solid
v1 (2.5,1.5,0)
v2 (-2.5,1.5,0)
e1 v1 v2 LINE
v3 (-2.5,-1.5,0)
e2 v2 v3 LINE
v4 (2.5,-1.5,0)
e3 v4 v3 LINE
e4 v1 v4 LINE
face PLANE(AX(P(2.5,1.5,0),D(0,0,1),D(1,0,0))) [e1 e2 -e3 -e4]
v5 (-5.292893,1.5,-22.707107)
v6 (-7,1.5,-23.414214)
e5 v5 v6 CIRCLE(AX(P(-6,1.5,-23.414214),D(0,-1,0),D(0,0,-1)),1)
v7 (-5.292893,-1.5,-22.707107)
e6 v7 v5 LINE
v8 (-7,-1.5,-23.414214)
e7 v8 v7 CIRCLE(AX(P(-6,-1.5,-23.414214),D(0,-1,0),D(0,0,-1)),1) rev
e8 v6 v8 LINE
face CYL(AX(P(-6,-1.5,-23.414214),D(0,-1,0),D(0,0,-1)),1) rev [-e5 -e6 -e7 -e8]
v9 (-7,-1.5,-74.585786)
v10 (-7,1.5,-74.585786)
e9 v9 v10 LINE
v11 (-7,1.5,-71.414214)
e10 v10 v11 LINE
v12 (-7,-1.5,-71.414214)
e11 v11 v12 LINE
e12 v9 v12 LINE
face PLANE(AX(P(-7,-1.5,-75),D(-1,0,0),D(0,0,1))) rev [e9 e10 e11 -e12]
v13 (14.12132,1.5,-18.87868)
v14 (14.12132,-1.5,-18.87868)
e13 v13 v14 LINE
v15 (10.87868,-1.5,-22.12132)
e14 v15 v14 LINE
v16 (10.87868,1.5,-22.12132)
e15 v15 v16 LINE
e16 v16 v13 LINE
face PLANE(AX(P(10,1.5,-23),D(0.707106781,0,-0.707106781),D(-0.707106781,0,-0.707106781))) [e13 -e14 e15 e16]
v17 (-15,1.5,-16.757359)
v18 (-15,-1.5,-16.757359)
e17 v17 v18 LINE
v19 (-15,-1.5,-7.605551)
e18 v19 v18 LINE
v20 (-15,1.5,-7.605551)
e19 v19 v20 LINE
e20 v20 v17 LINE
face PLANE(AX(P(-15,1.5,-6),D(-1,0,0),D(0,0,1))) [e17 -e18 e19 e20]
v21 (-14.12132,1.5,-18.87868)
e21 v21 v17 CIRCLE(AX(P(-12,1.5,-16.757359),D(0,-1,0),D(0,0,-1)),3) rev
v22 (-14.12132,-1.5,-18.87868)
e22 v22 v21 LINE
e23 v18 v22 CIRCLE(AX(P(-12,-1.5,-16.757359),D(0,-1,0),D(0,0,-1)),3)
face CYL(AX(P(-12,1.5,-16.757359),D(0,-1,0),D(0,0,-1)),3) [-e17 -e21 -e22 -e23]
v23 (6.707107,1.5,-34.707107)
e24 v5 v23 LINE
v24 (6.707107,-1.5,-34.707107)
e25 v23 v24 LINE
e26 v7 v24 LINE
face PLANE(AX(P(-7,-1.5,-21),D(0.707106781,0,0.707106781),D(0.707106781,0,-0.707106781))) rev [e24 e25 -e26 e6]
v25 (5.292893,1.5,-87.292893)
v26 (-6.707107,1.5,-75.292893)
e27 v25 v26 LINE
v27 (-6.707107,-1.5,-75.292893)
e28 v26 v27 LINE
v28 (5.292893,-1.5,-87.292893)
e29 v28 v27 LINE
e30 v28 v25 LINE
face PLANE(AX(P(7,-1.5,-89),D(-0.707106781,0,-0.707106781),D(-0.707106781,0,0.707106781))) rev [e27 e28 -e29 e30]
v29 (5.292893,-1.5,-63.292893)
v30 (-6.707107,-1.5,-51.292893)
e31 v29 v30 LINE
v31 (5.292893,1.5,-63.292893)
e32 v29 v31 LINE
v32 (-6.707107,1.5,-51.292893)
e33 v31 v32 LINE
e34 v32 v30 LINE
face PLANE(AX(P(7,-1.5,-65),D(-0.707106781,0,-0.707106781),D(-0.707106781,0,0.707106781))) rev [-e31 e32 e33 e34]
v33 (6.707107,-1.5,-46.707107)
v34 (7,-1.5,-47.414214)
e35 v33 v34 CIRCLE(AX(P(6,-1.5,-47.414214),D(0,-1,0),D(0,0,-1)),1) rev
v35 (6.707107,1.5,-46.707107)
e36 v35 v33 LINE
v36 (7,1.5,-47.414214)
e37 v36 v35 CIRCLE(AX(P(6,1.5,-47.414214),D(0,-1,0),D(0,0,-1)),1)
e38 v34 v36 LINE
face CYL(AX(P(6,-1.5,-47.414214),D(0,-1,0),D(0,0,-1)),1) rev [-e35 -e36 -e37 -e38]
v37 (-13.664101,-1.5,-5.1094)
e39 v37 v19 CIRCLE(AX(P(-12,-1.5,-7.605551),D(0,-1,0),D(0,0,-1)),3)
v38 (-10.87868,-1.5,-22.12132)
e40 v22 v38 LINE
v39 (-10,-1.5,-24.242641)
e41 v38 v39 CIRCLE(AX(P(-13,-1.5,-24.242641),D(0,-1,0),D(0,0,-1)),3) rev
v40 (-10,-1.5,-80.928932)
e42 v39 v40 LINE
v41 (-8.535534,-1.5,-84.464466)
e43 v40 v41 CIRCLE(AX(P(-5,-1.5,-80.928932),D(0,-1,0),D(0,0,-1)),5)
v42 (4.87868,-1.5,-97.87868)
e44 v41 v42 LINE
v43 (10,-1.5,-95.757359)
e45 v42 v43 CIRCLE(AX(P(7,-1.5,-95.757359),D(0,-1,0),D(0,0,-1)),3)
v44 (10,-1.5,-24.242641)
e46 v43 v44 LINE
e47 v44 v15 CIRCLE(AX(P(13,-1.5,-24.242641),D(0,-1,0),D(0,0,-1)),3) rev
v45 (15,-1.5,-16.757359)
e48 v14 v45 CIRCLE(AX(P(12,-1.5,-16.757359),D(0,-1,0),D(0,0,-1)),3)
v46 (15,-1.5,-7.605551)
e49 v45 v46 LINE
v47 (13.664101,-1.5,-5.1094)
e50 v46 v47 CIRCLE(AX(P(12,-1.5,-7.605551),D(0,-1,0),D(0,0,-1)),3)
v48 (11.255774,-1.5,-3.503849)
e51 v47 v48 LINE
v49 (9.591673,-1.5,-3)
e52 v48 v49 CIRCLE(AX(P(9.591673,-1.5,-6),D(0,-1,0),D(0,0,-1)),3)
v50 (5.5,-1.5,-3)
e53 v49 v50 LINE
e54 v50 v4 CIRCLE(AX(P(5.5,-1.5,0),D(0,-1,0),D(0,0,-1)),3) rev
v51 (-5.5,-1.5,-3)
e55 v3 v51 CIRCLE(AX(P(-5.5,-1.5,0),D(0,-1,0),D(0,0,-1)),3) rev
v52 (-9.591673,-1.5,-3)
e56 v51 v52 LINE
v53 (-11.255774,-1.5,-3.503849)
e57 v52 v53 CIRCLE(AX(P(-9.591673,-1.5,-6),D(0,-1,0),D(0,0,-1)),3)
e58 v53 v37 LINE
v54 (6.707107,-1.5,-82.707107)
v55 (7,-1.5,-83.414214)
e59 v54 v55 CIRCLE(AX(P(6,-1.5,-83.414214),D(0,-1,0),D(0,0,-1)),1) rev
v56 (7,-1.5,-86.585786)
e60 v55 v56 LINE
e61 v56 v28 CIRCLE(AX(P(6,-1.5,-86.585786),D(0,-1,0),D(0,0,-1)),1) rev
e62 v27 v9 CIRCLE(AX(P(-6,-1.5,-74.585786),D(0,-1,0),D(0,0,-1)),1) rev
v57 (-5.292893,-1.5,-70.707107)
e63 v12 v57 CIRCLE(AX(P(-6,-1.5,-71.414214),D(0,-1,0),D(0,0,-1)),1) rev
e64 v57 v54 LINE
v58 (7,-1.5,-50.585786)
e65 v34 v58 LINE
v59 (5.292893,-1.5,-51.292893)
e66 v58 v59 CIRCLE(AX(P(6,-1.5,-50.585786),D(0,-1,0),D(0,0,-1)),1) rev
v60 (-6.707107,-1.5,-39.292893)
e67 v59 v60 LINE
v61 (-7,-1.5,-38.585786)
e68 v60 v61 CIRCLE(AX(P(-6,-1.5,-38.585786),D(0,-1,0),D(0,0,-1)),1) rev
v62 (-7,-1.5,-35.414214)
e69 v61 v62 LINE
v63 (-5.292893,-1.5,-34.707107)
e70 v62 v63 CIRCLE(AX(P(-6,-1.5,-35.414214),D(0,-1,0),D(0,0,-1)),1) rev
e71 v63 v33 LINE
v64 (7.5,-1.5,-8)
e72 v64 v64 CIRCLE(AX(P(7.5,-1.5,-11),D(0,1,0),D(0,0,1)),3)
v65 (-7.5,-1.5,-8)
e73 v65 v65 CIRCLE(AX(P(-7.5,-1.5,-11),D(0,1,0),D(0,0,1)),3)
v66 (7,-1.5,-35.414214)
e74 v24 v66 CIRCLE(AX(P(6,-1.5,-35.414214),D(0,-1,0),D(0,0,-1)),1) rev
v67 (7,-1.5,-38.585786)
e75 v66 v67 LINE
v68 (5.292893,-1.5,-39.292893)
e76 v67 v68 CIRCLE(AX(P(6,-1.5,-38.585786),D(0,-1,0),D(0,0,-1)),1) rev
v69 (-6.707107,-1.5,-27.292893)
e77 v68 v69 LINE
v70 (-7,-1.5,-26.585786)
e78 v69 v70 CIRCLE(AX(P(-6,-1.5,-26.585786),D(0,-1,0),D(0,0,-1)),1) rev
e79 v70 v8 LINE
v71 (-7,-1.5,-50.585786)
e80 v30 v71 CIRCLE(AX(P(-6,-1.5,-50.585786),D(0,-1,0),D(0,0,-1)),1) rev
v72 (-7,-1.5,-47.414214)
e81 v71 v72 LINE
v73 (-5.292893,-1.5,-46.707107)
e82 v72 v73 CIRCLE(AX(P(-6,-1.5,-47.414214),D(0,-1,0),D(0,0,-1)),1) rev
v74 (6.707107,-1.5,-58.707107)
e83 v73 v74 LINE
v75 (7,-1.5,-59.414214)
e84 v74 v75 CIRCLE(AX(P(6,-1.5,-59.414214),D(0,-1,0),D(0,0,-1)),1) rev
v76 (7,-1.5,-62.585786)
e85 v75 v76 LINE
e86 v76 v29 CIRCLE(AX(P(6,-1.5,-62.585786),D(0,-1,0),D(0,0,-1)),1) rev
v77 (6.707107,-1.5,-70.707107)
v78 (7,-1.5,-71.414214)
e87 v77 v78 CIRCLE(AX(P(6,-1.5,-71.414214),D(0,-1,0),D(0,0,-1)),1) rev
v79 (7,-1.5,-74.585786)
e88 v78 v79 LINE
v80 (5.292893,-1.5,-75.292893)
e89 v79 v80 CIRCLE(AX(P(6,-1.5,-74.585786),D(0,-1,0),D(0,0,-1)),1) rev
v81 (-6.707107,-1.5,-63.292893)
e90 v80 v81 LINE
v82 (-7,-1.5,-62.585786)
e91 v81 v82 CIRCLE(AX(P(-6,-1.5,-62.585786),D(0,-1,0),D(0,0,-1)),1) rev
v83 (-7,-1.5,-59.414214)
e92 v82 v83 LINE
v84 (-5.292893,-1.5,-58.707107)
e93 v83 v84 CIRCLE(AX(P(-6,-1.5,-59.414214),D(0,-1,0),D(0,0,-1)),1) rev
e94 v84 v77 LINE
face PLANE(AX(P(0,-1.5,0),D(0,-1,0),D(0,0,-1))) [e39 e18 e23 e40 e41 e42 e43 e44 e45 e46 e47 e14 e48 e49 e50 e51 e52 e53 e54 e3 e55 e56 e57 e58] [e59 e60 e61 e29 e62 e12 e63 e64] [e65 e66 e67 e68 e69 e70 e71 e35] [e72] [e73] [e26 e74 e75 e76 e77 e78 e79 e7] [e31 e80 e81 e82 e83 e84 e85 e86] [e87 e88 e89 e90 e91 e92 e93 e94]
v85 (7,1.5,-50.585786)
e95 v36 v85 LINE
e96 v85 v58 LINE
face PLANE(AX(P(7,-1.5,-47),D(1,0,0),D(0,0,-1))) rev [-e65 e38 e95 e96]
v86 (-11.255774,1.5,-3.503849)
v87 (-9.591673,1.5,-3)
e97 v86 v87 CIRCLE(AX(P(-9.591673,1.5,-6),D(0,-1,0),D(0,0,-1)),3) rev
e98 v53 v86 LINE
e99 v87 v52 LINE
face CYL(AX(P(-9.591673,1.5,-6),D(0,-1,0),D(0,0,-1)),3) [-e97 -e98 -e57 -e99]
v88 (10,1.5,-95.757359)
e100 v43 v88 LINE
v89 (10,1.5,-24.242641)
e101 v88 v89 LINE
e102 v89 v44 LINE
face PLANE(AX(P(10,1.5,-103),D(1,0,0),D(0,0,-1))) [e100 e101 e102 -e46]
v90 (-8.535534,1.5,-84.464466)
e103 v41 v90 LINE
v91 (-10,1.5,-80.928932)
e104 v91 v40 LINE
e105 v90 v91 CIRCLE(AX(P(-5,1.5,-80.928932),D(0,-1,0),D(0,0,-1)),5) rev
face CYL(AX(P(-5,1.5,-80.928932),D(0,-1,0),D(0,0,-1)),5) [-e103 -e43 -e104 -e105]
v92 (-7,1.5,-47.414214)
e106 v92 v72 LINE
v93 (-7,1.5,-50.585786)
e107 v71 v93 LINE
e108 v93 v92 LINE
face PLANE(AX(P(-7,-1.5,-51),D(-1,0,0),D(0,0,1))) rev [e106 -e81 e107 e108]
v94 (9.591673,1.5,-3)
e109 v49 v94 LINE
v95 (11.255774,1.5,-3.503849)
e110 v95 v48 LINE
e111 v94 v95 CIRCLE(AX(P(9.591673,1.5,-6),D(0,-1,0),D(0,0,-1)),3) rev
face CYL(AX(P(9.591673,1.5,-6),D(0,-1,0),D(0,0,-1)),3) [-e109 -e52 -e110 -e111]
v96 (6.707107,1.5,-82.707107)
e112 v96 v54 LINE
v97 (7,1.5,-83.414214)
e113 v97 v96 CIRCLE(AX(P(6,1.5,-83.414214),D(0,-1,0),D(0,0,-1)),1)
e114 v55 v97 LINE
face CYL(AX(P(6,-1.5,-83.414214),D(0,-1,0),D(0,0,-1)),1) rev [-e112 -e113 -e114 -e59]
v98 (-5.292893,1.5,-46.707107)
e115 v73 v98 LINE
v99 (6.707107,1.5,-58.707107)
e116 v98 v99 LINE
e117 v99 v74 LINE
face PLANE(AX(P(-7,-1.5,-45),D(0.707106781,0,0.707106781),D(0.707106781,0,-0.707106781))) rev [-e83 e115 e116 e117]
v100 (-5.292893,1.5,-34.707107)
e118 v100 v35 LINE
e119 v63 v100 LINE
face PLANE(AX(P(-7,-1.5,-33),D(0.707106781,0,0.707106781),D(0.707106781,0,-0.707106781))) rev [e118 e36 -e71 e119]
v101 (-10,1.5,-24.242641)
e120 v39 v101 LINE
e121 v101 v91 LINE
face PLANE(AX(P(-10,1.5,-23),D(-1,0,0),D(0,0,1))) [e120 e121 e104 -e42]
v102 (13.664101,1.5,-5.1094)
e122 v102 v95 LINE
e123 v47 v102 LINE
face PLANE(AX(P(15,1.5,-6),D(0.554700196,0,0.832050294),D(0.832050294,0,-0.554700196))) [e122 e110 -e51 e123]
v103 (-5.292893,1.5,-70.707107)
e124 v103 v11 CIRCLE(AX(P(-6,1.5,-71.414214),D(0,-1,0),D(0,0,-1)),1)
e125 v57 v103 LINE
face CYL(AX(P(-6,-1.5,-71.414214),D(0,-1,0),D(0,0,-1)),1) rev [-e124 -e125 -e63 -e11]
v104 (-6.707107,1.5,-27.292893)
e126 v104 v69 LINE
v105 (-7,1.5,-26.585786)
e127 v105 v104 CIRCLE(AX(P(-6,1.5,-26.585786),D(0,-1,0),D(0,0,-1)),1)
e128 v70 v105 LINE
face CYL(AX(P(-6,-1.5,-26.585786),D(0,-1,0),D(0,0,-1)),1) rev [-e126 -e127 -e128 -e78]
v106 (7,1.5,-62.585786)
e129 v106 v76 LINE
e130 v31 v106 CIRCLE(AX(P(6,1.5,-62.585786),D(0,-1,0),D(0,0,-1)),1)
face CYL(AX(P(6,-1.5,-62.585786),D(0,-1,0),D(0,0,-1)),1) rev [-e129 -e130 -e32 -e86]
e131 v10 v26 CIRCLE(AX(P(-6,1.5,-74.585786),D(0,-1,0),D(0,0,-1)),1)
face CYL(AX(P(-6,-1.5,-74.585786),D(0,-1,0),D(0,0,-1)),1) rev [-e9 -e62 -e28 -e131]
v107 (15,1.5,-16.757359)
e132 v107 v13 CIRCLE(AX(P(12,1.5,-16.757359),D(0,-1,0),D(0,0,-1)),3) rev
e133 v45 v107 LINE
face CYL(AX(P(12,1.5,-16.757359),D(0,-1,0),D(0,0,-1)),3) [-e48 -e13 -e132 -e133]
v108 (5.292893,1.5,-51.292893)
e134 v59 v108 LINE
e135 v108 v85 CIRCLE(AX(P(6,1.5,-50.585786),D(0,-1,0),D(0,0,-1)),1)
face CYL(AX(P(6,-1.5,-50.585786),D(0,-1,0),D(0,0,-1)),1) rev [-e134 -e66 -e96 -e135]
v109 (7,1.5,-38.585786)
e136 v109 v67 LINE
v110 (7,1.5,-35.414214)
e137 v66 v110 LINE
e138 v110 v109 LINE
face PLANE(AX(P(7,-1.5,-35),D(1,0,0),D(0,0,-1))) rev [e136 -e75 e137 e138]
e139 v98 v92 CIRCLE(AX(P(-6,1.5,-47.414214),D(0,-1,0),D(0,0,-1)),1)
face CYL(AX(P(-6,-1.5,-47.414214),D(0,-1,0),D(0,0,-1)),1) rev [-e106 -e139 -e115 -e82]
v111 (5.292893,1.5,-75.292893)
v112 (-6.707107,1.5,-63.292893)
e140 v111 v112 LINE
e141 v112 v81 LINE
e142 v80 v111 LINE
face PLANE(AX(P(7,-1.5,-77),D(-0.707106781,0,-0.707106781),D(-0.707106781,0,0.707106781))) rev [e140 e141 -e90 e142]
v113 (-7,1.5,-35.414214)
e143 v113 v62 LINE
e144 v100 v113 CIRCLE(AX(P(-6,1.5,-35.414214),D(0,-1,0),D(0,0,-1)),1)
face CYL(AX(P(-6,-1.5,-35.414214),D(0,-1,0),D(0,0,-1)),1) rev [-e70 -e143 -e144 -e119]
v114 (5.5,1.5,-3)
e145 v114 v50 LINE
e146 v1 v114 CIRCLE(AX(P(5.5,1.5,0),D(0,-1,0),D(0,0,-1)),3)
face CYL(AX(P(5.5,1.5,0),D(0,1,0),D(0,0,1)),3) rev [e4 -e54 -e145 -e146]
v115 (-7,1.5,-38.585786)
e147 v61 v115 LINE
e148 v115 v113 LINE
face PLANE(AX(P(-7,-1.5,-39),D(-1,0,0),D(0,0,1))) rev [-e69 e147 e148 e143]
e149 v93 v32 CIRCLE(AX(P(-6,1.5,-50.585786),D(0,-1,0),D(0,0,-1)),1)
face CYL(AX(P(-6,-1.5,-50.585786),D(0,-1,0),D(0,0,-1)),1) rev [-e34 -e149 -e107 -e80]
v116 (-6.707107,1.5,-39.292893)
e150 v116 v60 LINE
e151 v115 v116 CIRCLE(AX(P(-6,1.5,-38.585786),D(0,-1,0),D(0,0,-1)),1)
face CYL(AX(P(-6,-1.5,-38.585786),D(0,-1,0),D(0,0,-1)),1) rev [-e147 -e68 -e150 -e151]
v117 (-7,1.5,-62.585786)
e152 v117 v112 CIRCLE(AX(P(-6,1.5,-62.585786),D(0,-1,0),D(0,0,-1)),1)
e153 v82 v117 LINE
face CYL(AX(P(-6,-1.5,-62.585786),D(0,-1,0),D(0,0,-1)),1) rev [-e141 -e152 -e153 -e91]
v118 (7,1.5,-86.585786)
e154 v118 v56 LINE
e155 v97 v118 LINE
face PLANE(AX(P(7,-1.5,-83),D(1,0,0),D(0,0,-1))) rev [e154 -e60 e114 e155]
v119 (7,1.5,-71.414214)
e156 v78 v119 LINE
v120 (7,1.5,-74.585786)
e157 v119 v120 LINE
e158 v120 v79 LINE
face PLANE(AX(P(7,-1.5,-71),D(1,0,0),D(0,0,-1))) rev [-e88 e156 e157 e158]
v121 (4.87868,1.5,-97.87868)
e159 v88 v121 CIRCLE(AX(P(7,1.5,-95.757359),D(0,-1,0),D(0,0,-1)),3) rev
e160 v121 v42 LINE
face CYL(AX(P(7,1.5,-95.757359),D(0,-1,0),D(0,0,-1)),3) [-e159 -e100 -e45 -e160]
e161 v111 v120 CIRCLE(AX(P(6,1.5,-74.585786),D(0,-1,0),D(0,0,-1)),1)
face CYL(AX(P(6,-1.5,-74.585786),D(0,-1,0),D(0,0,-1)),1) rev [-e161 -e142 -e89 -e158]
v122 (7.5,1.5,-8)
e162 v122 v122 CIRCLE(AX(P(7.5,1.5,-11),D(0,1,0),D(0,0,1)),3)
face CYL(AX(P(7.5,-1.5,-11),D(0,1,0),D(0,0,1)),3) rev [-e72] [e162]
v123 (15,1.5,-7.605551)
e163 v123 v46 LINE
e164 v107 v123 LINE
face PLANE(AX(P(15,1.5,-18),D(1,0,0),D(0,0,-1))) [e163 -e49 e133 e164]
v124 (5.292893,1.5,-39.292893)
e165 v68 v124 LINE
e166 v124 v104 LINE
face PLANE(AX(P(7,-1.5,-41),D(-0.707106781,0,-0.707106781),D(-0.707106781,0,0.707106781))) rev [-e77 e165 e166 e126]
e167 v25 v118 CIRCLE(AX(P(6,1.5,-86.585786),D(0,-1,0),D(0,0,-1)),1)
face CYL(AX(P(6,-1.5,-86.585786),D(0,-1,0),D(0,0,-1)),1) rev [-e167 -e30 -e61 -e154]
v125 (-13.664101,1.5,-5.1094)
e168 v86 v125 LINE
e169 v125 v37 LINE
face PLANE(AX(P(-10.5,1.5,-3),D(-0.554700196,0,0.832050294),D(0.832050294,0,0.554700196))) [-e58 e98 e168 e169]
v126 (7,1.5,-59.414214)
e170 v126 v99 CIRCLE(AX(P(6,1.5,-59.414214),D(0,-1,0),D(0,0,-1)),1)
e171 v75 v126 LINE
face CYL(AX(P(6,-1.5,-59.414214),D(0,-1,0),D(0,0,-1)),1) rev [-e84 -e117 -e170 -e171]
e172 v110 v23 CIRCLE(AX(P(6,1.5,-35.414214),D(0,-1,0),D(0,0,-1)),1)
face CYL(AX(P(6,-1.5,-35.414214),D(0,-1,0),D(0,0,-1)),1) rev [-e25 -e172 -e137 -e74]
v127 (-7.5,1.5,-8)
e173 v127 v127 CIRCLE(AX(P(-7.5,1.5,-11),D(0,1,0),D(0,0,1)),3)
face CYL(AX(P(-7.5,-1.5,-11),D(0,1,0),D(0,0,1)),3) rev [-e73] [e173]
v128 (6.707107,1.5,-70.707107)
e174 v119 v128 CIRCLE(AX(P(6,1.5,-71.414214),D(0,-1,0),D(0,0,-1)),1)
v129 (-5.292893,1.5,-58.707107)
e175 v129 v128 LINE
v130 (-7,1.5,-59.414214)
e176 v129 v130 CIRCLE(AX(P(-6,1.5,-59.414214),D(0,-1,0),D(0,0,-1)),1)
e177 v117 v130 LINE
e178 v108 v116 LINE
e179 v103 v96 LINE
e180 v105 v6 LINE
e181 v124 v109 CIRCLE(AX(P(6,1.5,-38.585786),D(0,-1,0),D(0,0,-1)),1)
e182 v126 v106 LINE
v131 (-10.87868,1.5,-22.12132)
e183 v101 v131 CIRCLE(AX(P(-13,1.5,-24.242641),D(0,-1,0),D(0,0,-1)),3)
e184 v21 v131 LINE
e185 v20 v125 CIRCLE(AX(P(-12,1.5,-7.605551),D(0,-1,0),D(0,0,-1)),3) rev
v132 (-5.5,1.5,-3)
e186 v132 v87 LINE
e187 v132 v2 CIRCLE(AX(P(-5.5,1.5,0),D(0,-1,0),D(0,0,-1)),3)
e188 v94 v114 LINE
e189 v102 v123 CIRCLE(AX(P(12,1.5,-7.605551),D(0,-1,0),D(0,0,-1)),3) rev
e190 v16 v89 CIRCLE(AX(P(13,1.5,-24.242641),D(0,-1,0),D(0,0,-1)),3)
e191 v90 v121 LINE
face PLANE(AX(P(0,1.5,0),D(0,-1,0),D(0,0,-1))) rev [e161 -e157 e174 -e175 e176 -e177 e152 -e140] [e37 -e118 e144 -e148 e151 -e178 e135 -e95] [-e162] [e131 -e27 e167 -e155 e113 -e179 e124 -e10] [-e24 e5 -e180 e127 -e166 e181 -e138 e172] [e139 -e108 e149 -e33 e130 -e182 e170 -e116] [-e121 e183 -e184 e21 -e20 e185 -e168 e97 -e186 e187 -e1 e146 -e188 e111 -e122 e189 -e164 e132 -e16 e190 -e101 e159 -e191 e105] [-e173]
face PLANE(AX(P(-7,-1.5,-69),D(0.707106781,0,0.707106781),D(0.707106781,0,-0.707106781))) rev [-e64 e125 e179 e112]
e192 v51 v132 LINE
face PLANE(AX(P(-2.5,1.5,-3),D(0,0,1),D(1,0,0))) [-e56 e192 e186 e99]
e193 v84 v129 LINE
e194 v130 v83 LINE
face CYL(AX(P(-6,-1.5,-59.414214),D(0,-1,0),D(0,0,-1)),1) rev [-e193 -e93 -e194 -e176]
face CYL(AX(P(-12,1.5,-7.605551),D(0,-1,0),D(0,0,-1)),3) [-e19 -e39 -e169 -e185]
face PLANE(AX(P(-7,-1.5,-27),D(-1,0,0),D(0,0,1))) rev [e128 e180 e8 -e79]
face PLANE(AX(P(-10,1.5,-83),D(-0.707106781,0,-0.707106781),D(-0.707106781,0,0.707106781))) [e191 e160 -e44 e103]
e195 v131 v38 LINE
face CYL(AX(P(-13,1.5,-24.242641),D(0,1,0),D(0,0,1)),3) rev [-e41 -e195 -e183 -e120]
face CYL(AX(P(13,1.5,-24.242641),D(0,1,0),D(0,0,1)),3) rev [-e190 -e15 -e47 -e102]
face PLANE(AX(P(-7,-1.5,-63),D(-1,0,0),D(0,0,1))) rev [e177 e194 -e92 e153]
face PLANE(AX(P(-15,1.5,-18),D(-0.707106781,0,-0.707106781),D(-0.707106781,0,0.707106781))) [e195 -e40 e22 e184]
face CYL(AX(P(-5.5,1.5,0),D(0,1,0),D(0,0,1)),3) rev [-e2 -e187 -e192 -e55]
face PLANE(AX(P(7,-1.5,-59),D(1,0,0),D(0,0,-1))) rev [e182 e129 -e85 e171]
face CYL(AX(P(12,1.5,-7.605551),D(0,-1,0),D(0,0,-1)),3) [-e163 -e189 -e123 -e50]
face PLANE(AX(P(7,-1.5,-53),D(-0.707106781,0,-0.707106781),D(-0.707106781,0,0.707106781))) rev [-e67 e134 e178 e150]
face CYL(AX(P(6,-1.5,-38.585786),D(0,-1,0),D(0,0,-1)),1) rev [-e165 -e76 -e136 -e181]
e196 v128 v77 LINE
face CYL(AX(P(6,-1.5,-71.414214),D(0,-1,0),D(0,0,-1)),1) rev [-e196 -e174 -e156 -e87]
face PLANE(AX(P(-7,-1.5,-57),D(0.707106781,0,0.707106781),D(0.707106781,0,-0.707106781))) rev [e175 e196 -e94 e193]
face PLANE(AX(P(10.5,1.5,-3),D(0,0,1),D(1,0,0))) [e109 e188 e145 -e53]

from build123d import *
from OCP.BRepFilletAPI import BRepFilletAPI_MakeFillet

# Parameters (mm, degrees)
BOSS_EXTRUDE1_DEPTH     = 1.5
CUT_EXTRUDE1_DEPTH      = 105.097310244
CUT_EXTRUDE2_DEPTH      = 105.097310244
CUT_EXTRUDE2_DEPTH_BACK = 105.097310244
SKETCH2_R               = 3
FILLET1_R               = 3
FILLET2_R               = 3
FILLET3_R1              = 5
FILLET3_R2              = 3
FILLET4_R               = 1
LPATTERN1_COUNT         = 5
LPATTERN1_PITCH         = 12
FILLET4_OF_LPATTERN1_R  = 1


with BuildPart() as part:
    # Sketch1 → Boss-Extrude1 (new, symmetric)
    with BuildSketch(Plane(origin=(0, 0, 0), x_dir=(1, 0, 0), z_dir=(0, 1, 0))):
        Polygon((-10, 83), (10, 103), (10, 23), (15, 18), (15, 6), (10.5, 3), (2.5, 3), (2.5, 0), (-2.5, 0), (-2.5, 3), (-10.5, 3), (-15, 6), (-15, 18), (-10, 23), align=None)
    extrude(amount=BOSS_EXTRUDE1_DEPTH, both=True)

    # Sketch1<3> → Cut-Extrude1 (cut, symmetric)
    with BuildSketch(Plane(origin=(0, 0, 0), x_dir=(1, 0, 0), z_dir=(0, 1, 0))):
        Polygon((7, 89), (-7, 75), (-7, 69), (7, 83), align=None)
    cut_extrude1 = extrude(amount=CUT_EXTRUDE1_DEPTH, both=True, mode=Mode.SUBTRACT)

    # Sketch2 → Cut-Extrude2 (cut, two sides: drawn at the far end of the back side and taken through both)
    with BuildSketch(Plane(origin=(0, 0, 0), x_dir=(1, 0, 0), z_dir=(0, 1, 0)).offset(-CUT_EXTRUDE2_DEPTH_BACK)):
        with Locations(Location((-7.5, 11, 0), (0, 0, 270))):
            Circle(SKETCH2_R)
        with Locations(Location((7.5, 11, 0), (0, 0, 270))):
            Circle(SKETCH2_R)
    extrude(amount=CUT_EXTRUDE2_DEPTH + CUT_EXTRUDE2_DEPTH_BACK, mode=Mode.SUBTRACT)

    # Fillet1
    fillet1_edges = [part.edges().sort_by_distance(p)[0] for p in [
        (2.5, 0, -3),
        (-2.5, 0, -3),
    ]]
    fillet(fillet1_edges, radius=FILLET1_R - 0.0001)  # a hair under: the kernel refuses the full size

    # Fillet2
    fillet2_edges = [part.edges().sort_by_distance(p)[0] for p in [
        (-10, 0, -23),
        (-15, 0, -18),
        (-15, 0, -6),
        (-10.5, 0, -3),
        (10.5, 0, -3),
        (15, 0, -6),
        (15, 0, -18),
        (10, 0, -23),
    ]]
    fillet(fillet2_edges, radius=FILLET2_R)

    # Fillet3: one fillet with a radius per group of edges: ONE call of the kernel's fillet builder (fillet() takes one radius for all edges)
    fillet3_edges_1 = [part.edges().sort_by_distance(p)[0] for p in [
        (-10, 0, -83),
    ]]
    fillet3_edges_2 = [part.edges().sort_by_distance(p)[0] for p in [
        (10, 0, -103),
    ]]
    fillet3 = BRepFilletAPI_MakeFillet(part.part.solid().wrapped)
    for e in fillet3_edges_1:
        fillet3.Add(FILLET3_R1, e.wrapped)
    for e in fillet3_edges_2:
        fillet3.Add(FILLET3_R2, e.wrapped)
    add(Compound.cast(fillet3.Shape()), mode=Mode.REPLACE)

    # Fillet4
    fillet4_edges = [part.edges().sort_by_distance(p)[0] for p in [
        (-7, 0, -69),
        (-7, 0, -75),
        (7, 0, -89),
        (7, 0, -83),
    ]]
    fillet(fillet4_edges, radius=FILLET4_R)

    # LPattern1: Cut-Extrude1 ×5
    with Locations(*[(0, 0, i * LPATTERN1_PITCH) for i in range(1, LPATTERN1_COUNT)]):
        add(cut_extrude1, mode=Mode.SUBTRACT)

    # Fillet4 of LPattern1
    fillet4_of_lpattern1_edges = [part.edges().sort_by_distance(p)[0] for p in [
        (-7, 0, -57),
        (-7, 0, -63),
        (7, 0, -77),
        (7, 0, -71),
        (-7, 0, -45),
        (-7, 0, -51),
        (7, 0, -65),
        (7, 0, -59),
        (-7, 0, -33),
        (-7, 0, -39),
        (7, 0, -53),
        (7, 0, -47),
        (-7, 0, -21),
        (-7, 0, -27),
        (7, 0, -41),
        (7, 0, -35),
    ]]
    fillet(fillet4_of_lpattern1_edges, radius=FILLET4_OF_LPATTERN1_R)


solid = part.part
